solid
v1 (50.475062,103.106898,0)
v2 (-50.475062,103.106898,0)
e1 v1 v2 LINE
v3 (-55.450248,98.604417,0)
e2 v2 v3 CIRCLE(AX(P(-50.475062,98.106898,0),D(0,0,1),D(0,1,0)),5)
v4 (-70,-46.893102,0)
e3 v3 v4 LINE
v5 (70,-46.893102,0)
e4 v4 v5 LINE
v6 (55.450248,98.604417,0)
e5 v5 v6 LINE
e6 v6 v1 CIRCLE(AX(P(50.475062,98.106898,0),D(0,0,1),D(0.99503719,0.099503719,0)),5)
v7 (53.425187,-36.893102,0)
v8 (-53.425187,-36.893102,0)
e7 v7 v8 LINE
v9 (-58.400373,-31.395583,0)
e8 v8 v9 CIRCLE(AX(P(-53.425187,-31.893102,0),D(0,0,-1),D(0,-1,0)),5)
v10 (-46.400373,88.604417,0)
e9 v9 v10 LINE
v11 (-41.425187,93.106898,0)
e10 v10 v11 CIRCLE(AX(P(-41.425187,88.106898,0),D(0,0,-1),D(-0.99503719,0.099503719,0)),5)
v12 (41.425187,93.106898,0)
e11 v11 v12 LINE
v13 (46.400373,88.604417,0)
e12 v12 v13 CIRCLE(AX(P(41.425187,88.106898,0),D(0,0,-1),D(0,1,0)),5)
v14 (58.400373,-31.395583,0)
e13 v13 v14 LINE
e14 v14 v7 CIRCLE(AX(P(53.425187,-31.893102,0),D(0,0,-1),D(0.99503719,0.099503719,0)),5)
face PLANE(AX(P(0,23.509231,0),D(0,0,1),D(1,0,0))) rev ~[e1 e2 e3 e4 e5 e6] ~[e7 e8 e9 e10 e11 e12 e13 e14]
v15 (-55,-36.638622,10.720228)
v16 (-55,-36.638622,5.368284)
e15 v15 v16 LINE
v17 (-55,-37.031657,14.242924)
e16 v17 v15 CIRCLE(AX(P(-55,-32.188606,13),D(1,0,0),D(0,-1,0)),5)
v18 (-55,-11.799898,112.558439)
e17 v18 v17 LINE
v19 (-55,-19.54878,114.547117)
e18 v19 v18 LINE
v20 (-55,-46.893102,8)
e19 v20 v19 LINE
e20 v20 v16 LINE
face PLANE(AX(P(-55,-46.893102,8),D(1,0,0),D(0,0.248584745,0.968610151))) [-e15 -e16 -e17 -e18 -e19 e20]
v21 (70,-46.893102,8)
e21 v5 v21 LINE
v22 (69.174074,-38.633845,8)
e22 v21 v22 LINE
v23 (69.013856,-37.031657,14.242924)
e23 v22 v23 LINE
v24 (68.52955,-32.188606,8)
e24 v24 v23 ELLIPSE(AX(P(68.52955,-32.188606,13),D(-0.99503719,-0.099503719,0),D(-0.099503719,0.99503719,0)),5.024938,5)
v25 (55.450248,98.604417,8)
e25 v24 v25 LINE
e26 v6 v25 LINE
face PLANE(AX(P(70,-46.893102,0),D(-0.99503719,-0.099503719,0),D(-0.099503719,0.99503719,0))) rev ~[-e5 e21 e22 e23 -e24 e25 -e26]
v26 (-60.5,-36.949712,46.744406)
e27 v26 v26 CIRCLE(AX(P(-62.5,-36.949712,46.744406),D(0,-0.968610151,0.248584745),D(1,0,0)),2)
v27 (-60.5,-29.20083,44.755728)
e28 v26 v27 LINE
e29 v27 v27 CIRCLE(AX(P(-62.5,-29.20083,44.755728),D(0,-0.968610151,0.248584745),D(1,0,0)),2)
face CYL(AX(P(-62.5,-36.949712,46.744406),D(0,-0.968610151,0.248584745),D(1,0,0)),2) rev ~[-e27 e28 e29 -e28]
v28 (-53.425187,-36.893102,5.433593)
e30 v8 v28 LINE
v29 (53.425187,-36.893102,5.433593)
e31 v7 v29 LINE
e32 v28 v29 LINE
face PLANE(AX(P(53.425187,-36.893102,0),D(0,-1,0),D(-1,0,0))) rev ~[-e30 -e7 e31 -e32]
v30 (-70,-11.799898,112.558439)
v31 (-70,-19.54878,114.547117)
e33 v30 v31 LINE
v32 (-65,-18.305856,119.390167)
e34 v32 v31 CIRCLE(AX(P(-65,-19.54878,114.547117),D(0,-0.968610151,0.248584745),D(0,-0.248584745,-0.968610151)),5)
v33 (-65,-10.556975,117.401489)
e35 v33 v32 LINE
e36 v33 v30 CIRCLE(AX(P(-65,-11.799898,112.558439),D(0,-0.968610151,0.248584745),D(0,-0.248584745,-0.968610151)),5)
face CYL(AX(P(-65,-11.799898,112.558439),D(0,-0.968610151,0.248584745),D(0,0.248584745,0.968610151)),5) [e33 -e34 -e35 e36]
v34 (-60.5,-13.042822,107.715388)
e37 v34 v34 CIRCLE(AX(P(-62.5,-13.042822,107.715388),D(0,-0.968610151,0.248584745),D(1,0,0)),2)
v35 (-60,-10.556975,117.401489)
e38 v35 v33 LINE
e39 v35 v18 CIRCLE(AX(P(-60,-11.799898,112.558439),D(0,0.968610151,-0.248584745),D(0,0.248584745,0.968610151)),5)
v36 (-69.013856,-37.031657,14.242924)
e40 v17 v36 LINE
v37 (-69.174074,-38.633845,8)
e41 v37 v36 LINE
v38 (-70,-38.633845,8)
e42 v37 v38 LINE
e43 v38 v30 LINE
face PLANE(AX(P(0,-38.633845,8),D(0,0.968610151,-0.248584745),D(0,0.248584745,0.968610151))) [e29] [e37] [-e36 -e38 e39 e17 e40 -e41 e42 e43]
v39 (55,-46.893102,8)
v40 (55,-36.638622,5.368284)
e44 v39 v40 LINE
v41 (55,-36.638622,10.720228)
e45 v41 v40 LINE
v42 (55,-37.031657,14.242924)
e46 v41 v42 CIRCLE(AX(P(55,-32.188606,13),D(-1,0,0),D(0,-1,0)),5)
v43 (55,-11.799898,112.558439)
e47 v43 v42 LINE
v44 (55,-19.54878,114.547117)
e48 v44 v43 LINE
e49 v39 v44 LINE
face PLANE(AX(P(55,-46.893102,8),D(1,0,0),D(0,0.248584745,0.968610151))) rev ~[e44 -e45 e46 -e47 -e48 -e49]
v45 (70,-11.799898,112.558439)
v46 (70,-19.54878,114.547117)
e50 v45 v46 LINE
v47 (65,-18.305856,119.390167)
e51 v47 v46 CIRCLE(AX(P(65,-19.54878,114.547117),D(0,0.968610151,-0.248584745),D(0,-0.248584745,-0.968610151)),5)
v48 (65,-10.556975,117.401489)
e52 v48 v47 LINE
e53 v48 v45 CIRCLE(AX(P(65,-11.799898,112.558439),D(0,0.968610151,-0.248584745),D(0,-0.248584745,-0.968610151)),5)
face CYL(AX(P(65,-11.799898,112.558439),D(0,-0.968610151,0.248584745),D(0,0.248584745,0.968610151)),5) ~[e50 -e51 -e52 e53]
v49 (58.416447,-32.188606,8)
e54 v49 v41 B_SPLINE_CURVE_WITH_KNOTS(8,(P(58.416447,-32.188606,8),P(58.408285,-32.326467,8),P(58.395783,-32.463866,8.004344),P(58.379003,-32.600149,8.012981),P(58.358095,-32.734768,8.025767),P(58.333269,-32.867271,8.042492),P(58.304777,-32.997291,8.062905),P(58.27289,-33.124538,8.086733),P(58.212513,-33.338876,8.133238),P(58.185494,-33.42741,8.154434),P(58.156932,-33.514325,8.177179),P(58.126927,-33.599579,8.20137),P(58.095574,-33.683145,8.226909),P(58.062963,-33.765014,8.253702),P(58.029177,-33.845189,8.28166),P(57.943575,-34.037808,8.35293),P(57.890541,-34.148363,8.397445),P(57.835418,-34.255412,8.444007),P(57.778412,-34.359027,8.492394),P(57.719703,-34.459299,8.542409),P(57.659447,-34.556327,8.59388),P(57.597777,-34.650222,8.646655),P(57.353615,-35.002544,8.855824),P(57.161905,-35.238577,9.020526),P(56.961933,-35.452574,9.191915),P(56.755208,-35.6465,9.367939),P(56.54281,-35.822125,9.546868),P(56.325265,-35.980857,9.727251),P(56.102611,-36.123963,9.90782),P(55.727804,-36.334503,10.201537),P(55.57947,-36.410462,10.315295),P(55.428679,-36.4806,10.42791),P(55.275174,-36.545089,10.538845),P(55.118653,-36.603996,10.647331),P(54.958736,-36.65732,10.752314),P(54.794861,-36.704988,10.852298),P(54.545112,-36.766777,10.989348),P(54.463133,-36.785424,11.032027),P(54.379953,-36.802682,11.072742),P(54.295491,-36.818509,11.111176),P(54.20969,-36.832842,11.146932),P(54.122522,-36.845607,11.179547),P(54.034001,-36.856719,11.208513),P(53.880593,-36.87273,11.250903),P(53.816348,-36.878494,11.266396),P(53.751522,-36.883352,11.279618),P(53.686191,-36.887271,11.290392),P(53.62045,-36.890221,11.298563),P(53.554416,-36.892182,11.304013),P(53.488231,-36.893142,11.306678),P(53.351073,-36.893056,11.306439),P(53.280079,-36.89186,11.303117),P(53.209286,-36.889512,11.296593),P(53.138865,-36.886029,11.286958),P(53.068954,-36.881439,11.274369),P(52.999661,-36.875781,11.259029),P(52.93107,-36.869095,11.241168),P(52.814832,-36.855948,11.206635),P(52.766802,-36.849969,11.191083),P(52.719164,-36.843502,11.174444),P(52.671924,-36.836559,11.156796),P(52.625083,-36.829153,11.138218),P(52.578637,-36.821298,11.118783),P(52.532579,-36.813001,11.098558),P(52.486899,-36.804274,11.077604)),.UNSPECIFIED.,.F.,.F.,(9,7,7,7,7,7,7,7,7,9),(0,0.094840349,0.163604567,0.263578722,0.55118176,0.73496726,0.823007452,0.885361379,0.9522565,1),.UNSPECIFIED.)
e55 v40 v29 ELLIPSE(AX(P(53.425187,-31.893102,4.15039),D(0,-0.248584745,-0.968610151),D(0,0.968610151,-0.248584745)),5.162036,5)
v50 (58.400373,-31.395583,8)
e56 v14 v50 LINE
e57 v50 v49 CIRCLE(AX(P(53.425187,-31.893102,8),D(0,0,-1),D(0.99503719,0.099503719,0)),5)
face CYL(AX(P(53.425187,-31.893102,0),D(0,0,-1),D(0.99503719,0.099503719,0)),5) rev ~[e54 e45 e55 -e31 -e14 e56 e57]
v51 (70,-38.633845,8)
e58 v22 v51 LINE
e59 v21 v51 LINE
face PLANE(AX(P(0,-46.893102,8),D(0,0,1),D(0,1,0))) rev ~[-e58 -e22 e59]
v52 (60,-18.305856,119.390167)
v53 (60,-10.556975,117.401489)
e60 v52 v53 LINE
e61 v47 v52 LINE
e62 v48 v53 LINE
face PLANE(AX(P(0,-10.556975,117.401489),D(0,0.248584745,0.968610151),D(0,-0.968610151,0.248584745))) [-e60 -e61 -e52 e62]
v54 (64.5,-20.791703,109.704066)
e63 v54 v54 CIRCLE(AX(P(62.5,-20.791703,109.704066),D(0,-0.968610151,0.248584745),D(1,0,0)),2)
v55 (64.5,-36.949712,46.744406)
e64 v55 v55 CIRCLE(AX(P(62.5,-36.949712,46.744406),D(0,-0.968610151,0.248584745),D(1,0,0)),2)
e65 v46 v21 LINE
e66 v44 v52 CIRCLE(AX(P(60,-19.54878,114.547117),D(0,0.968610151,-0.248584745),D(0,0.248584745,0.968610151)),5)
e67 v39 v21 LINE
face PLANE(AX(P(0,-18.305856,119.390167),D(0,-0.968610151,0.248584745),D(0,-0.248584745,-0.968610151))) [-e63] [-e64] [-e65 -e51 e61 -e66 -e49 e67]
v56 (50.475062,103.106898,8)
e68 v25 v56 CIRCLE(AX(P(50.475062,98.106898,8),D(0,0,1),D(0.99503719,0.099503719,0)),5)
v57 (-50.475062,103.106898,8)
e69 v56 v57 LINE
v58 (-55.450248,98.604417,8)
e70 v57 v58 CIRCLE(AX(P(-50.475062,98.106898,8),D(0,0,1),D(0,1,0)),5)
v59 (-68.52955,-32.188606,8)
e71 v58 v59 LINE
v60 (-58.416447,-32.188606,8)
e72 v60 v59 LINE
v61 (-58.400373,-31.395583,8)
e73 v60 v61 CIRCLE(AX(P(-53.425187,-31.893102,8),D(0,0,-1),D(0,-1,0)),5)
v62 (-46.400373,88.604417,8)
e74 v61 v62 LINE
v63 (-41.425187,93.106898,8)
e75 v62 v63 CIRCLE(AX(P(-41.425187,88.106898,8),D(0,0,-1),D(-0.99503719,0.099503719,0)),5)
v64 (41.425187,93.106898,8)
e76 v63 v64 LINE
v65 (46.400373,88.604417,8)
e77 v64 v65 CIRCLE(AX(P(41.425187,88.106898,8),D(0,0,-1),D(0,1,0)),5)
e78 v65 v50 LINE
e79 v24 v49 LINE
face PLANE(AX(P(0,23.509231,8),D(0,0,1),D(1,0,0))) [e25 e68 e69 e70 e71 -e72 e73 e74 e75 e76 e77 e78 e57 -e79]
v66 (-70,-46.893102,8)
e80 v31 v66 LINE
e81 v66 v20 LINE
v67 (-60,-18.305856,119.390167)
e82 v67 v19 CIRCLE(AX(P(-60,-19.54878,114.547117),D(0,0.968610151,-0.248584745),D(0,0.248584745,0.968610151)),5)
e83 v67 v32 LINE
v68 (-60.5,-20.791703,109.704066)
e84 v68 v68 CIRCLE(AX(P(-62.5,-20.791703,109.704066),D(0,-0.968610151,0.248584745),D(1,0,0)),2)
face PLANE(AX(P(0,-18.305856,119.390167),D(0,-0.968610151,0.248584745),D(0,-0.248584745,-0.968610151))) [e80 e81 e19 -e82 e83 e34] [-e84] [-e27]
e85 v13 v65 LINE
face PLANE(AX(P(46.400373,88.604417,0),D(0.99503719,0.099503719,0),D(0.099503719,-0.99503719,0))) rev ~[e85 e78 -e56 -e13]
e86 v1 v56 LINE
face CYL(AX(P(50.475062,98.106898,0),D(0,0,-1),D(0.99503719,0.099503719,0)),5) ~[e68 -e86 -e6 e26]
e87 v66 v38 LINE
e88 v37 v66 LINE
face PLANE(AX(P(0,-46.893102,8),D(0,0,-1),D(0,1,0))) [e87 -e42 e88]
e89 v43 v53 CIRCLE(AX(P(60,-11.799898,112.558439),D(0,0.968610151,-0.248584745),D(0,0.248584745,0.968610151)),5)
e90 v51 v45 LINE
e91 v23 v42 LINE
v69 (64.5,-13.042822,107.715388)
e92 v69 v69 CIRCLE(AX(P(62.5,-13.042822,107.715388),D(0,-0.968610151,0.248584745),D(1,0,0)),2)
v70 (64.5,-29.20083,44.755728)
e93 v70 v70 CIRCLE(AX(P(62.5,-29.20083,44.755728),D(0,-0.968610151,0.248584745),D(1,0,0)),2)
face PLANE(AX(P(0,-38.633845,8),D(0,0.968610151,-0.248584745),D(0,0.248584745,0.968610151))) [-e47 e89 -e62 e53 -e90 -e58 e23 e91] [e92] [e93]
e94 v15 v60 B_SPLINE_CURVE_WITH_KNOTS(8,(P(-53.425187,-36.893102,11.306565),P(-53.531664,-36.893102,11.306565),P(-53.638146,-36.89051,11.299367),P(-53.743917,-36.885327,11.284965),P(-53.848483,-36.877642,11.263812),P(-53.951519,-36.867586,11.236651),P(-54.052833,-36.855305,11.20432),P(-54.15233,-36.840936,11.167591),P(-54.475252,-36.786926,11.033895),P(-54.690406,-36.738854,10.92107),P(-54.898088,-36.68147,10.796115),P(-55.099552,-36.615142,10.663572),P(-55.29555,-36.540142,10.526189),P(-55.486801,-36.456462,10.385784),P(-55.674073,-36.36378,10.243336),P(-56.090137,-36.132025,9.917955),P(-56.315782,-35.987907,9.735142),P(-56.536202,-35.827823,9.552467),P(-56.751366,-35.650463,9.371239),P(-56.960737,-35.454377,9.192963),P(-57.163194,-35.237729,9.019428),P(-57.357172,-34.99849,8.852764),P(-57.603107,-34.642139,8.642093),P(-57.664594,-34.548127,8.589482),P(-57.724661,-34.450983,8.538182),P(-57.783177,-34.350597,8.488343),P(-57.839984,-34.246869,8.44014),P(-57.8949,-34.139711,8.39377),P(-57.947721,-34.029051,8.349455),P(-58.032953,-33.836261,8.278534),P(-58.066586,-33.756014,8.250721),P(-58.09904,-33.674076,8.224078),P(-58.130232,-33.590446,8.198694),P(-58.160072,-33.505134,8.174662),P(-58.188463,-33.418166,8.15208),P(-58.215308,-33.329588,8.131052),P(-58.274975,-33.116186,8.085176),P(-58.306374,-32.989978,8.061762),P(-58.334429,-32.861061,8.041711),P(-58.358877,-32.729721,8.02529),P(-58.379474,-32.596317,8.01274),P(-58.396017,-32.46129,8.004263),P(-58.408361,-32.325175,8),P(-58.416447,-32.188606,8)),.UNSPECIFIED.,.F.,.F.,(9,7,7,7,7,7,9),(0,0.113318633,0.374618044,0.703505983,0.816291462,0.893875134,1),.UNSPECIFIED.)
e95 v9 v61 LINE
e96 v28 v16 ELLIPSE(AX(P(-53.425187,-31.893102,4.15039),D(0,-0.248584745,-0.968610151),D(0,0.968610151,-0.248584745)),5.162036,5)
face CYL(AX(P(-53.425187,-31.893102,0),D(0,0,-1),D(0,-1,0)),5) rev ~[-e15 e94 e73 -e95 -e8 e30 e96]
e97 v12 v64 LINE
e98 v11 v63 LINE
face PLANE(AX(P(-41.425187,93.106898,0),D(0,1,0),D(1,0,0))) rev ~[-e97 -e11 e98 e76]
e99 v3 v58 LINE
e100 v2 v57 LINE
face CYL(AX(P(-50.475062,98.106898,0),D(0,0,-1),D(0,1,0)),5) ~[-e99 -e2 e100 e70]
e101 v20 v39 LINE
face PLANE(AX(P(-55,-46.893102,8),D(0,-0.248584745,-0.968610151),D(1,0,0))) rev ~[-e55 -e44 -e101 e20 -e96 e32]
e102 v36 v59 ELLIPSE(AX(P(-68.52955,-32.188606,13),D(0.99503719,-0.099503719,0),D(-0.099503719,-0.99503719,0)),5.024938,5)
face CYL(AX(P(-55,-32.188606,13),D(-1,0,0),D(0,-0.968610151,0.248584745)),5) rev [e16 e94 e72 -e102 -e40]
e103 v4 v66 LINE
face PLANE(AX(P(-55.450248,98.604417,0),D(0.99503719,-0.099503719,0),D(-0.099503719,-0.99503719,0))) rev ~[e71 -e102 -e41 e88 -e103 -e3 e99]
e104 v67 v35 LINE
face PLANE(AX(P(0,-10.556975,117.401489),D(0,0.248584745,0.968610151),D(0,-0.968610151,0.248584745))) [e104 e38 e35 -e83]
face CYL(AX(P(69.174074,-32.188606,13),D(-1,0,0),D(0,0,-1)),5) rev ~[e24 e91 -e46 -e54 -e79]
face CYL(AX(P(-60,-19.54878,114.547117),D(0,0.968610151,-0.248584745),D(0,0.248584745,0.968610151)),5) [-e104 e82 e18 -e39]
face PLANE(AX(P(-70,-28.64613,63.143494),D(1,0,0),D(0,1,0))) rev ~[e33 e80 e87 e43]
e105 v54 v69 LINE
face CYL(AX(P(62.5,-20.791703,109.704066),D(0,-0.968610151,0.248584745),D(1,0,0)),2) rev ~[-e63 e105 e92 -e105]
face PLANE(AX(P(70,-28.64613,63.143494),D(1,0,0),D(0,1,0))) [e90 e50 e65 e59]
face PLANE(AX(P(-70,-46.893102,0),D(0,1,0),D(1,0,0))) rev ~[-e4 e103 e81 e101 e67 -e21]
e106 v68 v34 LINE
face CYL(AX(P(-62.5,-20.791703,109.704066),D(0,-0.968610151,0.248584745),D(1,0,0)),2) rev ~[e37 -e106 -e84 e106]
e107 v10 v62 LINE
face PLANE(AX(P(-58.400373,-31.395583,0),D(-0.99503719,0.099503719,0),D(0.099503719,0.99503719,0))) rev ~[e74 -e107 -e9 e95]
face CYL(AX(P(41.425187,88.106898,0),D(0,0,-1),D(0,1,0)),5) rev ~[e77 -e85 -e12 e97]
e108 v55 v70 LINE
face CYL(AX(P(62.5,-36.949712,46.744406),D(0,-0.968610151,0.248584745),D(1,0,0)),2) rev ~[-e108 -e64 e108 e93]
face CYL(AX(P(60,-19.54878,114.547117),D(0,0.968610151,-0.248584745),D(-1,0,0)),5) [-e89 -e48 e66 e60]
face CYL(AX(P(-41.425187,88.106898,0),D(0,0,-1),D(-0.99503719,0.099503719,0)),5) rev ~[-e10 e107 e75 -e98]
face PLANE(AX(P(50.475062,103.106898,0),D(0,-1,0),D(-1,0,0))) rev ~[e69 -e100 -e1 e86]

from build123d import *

# Parameters (mm, degrees)
F1_DEPTH      = 8
F3_DEPTH      = 70
F3_DEPTH_BACK = 70
F4_W          = 110
F4_H          = 115
F4_R          = 2
F5_DEPTH      = 10.5877977107
F6_R          = 5
F7_R          = 5


with BuildPart() as f1:
    # F0 (on Top) → F1 (new body)
    with BuildSketch(Plane.XY):
        with BuildLine():
            Line((-55.4502481405, 98.6044170713), (-70, -46.8931015238))
            Line((-70, -46.8931015238), (70, -46.8931015238))
            Line((70, -46.8931015238), (55.4502481405, 98.6044170713))
            ThreePointArc((55.4502481405, 98.6044170713), (53.8300887932, 101.8141611439), (50.4750621894, 103.1068984762))
            Line((50.4750621894, 103.1068984762), (-50.4750621894, 103.1068984762))
            ThreePointArc((-50.4750621894, 103.1068984762), (-53.8300887932, 101.8141611439), (-55.4502481405, 98.6044170713))
        make_face()
        with BuildLine():
            Line((-41.4251865683, 93.1068984762), (41.4251865683, 93.1068984762))
            ThreePointArc((41.4251865683, 93.1068984762), (44.7802131721, 91.8141611439), (46.4003725194, 88.6044170713))
            Line((46.4003725194, 88.6044170713), (58.4003725194, -31.3955829287))
            ThreePointArc((58.4003725194, -31.3955829287), (57.1324492361, -35.2481281276), (53.4251865683, -36.8931015238))
            Line((53.4251865683, -36.8931015238), (-53.4251865683, -36.8931015238))
            ThreePointArc((-53.4251865683, -36.8931015238), (-57.1324492361, -35.2481281276), (-58.4003725194, -31.3955829287))
            Line((-58.4003725194, -31.3955829287), (-46.4003725194, 88.6044170713))
            ThreePointArc((-46.4003725194, 88.6044170713), (-44.7802131721, 91.8141611439), (-41.4251865683, 93.1068984762))
        make_face(mode=Mode.SUBTRACT)
    extrude(amount=F1_DEPTH)

    # F2 (on Right) → F3 (join, two sides)
    with BuildSketch(Plane.YZ) as f3_sk:
        Polygon((-18.3058557984, 119.3901673481), (-46.8931015238, 8), (-38.633844698, 8), (-35.4294686048, 20.4858474544), (-10.5569745916, 117.4014893846), align=None)
    extrude(amount=F3_DEPTH)
    extrude(f3_sk.sketch, amount=-F3_DEPTH_BACK)

    # F4 (on face) → F5 (cut, through all)
    with BuildSketch(Plane(origin=(0, -45.9216252544, 11.7853560733), x_dir=(1, 0, 0), z_dir=(0, -0.9686101509, 0.2485847454))):
        with Locations((0, 53.5919715017)):
            Rectangle(F4_W, F4_H)
        with Locations((-62.5, 101.0919715017)):
            Circle(F4_R)
        with Locations((-62.5, 36.0919715017)):
            Circle(F4_R)
        with Locations((62.5, 36.0919715017)):
            Circle(F4_R)
        with Locations((62.5, 101.0919715017)):
            Circle(F4_R)
    extrude(amount=-F5_DEPTH, mode=Mode.SUBTRACT)

    # F6
    f6_edges = [f1.edges().sort_by_distance(p)[0] for p in [
        (-70, -14.431415, 118.395828),
        (-55, -14.431415, 118.395828),
        (55, -14.431415, 118.395828),
        (70, -14.431415, 118.395828),
    ]]
    fillet(f6_edges, radius=F6_R)

    # F7
    f7_edges = [f1.edges().sort_by_distance(p)[0] for p in [
        (-62.087037, -38.633845, 8),
        (62.087037, -38.633845, 8),
    ]]
    fillet(f7_edges, radius=F7_R)


solid = f1.part
